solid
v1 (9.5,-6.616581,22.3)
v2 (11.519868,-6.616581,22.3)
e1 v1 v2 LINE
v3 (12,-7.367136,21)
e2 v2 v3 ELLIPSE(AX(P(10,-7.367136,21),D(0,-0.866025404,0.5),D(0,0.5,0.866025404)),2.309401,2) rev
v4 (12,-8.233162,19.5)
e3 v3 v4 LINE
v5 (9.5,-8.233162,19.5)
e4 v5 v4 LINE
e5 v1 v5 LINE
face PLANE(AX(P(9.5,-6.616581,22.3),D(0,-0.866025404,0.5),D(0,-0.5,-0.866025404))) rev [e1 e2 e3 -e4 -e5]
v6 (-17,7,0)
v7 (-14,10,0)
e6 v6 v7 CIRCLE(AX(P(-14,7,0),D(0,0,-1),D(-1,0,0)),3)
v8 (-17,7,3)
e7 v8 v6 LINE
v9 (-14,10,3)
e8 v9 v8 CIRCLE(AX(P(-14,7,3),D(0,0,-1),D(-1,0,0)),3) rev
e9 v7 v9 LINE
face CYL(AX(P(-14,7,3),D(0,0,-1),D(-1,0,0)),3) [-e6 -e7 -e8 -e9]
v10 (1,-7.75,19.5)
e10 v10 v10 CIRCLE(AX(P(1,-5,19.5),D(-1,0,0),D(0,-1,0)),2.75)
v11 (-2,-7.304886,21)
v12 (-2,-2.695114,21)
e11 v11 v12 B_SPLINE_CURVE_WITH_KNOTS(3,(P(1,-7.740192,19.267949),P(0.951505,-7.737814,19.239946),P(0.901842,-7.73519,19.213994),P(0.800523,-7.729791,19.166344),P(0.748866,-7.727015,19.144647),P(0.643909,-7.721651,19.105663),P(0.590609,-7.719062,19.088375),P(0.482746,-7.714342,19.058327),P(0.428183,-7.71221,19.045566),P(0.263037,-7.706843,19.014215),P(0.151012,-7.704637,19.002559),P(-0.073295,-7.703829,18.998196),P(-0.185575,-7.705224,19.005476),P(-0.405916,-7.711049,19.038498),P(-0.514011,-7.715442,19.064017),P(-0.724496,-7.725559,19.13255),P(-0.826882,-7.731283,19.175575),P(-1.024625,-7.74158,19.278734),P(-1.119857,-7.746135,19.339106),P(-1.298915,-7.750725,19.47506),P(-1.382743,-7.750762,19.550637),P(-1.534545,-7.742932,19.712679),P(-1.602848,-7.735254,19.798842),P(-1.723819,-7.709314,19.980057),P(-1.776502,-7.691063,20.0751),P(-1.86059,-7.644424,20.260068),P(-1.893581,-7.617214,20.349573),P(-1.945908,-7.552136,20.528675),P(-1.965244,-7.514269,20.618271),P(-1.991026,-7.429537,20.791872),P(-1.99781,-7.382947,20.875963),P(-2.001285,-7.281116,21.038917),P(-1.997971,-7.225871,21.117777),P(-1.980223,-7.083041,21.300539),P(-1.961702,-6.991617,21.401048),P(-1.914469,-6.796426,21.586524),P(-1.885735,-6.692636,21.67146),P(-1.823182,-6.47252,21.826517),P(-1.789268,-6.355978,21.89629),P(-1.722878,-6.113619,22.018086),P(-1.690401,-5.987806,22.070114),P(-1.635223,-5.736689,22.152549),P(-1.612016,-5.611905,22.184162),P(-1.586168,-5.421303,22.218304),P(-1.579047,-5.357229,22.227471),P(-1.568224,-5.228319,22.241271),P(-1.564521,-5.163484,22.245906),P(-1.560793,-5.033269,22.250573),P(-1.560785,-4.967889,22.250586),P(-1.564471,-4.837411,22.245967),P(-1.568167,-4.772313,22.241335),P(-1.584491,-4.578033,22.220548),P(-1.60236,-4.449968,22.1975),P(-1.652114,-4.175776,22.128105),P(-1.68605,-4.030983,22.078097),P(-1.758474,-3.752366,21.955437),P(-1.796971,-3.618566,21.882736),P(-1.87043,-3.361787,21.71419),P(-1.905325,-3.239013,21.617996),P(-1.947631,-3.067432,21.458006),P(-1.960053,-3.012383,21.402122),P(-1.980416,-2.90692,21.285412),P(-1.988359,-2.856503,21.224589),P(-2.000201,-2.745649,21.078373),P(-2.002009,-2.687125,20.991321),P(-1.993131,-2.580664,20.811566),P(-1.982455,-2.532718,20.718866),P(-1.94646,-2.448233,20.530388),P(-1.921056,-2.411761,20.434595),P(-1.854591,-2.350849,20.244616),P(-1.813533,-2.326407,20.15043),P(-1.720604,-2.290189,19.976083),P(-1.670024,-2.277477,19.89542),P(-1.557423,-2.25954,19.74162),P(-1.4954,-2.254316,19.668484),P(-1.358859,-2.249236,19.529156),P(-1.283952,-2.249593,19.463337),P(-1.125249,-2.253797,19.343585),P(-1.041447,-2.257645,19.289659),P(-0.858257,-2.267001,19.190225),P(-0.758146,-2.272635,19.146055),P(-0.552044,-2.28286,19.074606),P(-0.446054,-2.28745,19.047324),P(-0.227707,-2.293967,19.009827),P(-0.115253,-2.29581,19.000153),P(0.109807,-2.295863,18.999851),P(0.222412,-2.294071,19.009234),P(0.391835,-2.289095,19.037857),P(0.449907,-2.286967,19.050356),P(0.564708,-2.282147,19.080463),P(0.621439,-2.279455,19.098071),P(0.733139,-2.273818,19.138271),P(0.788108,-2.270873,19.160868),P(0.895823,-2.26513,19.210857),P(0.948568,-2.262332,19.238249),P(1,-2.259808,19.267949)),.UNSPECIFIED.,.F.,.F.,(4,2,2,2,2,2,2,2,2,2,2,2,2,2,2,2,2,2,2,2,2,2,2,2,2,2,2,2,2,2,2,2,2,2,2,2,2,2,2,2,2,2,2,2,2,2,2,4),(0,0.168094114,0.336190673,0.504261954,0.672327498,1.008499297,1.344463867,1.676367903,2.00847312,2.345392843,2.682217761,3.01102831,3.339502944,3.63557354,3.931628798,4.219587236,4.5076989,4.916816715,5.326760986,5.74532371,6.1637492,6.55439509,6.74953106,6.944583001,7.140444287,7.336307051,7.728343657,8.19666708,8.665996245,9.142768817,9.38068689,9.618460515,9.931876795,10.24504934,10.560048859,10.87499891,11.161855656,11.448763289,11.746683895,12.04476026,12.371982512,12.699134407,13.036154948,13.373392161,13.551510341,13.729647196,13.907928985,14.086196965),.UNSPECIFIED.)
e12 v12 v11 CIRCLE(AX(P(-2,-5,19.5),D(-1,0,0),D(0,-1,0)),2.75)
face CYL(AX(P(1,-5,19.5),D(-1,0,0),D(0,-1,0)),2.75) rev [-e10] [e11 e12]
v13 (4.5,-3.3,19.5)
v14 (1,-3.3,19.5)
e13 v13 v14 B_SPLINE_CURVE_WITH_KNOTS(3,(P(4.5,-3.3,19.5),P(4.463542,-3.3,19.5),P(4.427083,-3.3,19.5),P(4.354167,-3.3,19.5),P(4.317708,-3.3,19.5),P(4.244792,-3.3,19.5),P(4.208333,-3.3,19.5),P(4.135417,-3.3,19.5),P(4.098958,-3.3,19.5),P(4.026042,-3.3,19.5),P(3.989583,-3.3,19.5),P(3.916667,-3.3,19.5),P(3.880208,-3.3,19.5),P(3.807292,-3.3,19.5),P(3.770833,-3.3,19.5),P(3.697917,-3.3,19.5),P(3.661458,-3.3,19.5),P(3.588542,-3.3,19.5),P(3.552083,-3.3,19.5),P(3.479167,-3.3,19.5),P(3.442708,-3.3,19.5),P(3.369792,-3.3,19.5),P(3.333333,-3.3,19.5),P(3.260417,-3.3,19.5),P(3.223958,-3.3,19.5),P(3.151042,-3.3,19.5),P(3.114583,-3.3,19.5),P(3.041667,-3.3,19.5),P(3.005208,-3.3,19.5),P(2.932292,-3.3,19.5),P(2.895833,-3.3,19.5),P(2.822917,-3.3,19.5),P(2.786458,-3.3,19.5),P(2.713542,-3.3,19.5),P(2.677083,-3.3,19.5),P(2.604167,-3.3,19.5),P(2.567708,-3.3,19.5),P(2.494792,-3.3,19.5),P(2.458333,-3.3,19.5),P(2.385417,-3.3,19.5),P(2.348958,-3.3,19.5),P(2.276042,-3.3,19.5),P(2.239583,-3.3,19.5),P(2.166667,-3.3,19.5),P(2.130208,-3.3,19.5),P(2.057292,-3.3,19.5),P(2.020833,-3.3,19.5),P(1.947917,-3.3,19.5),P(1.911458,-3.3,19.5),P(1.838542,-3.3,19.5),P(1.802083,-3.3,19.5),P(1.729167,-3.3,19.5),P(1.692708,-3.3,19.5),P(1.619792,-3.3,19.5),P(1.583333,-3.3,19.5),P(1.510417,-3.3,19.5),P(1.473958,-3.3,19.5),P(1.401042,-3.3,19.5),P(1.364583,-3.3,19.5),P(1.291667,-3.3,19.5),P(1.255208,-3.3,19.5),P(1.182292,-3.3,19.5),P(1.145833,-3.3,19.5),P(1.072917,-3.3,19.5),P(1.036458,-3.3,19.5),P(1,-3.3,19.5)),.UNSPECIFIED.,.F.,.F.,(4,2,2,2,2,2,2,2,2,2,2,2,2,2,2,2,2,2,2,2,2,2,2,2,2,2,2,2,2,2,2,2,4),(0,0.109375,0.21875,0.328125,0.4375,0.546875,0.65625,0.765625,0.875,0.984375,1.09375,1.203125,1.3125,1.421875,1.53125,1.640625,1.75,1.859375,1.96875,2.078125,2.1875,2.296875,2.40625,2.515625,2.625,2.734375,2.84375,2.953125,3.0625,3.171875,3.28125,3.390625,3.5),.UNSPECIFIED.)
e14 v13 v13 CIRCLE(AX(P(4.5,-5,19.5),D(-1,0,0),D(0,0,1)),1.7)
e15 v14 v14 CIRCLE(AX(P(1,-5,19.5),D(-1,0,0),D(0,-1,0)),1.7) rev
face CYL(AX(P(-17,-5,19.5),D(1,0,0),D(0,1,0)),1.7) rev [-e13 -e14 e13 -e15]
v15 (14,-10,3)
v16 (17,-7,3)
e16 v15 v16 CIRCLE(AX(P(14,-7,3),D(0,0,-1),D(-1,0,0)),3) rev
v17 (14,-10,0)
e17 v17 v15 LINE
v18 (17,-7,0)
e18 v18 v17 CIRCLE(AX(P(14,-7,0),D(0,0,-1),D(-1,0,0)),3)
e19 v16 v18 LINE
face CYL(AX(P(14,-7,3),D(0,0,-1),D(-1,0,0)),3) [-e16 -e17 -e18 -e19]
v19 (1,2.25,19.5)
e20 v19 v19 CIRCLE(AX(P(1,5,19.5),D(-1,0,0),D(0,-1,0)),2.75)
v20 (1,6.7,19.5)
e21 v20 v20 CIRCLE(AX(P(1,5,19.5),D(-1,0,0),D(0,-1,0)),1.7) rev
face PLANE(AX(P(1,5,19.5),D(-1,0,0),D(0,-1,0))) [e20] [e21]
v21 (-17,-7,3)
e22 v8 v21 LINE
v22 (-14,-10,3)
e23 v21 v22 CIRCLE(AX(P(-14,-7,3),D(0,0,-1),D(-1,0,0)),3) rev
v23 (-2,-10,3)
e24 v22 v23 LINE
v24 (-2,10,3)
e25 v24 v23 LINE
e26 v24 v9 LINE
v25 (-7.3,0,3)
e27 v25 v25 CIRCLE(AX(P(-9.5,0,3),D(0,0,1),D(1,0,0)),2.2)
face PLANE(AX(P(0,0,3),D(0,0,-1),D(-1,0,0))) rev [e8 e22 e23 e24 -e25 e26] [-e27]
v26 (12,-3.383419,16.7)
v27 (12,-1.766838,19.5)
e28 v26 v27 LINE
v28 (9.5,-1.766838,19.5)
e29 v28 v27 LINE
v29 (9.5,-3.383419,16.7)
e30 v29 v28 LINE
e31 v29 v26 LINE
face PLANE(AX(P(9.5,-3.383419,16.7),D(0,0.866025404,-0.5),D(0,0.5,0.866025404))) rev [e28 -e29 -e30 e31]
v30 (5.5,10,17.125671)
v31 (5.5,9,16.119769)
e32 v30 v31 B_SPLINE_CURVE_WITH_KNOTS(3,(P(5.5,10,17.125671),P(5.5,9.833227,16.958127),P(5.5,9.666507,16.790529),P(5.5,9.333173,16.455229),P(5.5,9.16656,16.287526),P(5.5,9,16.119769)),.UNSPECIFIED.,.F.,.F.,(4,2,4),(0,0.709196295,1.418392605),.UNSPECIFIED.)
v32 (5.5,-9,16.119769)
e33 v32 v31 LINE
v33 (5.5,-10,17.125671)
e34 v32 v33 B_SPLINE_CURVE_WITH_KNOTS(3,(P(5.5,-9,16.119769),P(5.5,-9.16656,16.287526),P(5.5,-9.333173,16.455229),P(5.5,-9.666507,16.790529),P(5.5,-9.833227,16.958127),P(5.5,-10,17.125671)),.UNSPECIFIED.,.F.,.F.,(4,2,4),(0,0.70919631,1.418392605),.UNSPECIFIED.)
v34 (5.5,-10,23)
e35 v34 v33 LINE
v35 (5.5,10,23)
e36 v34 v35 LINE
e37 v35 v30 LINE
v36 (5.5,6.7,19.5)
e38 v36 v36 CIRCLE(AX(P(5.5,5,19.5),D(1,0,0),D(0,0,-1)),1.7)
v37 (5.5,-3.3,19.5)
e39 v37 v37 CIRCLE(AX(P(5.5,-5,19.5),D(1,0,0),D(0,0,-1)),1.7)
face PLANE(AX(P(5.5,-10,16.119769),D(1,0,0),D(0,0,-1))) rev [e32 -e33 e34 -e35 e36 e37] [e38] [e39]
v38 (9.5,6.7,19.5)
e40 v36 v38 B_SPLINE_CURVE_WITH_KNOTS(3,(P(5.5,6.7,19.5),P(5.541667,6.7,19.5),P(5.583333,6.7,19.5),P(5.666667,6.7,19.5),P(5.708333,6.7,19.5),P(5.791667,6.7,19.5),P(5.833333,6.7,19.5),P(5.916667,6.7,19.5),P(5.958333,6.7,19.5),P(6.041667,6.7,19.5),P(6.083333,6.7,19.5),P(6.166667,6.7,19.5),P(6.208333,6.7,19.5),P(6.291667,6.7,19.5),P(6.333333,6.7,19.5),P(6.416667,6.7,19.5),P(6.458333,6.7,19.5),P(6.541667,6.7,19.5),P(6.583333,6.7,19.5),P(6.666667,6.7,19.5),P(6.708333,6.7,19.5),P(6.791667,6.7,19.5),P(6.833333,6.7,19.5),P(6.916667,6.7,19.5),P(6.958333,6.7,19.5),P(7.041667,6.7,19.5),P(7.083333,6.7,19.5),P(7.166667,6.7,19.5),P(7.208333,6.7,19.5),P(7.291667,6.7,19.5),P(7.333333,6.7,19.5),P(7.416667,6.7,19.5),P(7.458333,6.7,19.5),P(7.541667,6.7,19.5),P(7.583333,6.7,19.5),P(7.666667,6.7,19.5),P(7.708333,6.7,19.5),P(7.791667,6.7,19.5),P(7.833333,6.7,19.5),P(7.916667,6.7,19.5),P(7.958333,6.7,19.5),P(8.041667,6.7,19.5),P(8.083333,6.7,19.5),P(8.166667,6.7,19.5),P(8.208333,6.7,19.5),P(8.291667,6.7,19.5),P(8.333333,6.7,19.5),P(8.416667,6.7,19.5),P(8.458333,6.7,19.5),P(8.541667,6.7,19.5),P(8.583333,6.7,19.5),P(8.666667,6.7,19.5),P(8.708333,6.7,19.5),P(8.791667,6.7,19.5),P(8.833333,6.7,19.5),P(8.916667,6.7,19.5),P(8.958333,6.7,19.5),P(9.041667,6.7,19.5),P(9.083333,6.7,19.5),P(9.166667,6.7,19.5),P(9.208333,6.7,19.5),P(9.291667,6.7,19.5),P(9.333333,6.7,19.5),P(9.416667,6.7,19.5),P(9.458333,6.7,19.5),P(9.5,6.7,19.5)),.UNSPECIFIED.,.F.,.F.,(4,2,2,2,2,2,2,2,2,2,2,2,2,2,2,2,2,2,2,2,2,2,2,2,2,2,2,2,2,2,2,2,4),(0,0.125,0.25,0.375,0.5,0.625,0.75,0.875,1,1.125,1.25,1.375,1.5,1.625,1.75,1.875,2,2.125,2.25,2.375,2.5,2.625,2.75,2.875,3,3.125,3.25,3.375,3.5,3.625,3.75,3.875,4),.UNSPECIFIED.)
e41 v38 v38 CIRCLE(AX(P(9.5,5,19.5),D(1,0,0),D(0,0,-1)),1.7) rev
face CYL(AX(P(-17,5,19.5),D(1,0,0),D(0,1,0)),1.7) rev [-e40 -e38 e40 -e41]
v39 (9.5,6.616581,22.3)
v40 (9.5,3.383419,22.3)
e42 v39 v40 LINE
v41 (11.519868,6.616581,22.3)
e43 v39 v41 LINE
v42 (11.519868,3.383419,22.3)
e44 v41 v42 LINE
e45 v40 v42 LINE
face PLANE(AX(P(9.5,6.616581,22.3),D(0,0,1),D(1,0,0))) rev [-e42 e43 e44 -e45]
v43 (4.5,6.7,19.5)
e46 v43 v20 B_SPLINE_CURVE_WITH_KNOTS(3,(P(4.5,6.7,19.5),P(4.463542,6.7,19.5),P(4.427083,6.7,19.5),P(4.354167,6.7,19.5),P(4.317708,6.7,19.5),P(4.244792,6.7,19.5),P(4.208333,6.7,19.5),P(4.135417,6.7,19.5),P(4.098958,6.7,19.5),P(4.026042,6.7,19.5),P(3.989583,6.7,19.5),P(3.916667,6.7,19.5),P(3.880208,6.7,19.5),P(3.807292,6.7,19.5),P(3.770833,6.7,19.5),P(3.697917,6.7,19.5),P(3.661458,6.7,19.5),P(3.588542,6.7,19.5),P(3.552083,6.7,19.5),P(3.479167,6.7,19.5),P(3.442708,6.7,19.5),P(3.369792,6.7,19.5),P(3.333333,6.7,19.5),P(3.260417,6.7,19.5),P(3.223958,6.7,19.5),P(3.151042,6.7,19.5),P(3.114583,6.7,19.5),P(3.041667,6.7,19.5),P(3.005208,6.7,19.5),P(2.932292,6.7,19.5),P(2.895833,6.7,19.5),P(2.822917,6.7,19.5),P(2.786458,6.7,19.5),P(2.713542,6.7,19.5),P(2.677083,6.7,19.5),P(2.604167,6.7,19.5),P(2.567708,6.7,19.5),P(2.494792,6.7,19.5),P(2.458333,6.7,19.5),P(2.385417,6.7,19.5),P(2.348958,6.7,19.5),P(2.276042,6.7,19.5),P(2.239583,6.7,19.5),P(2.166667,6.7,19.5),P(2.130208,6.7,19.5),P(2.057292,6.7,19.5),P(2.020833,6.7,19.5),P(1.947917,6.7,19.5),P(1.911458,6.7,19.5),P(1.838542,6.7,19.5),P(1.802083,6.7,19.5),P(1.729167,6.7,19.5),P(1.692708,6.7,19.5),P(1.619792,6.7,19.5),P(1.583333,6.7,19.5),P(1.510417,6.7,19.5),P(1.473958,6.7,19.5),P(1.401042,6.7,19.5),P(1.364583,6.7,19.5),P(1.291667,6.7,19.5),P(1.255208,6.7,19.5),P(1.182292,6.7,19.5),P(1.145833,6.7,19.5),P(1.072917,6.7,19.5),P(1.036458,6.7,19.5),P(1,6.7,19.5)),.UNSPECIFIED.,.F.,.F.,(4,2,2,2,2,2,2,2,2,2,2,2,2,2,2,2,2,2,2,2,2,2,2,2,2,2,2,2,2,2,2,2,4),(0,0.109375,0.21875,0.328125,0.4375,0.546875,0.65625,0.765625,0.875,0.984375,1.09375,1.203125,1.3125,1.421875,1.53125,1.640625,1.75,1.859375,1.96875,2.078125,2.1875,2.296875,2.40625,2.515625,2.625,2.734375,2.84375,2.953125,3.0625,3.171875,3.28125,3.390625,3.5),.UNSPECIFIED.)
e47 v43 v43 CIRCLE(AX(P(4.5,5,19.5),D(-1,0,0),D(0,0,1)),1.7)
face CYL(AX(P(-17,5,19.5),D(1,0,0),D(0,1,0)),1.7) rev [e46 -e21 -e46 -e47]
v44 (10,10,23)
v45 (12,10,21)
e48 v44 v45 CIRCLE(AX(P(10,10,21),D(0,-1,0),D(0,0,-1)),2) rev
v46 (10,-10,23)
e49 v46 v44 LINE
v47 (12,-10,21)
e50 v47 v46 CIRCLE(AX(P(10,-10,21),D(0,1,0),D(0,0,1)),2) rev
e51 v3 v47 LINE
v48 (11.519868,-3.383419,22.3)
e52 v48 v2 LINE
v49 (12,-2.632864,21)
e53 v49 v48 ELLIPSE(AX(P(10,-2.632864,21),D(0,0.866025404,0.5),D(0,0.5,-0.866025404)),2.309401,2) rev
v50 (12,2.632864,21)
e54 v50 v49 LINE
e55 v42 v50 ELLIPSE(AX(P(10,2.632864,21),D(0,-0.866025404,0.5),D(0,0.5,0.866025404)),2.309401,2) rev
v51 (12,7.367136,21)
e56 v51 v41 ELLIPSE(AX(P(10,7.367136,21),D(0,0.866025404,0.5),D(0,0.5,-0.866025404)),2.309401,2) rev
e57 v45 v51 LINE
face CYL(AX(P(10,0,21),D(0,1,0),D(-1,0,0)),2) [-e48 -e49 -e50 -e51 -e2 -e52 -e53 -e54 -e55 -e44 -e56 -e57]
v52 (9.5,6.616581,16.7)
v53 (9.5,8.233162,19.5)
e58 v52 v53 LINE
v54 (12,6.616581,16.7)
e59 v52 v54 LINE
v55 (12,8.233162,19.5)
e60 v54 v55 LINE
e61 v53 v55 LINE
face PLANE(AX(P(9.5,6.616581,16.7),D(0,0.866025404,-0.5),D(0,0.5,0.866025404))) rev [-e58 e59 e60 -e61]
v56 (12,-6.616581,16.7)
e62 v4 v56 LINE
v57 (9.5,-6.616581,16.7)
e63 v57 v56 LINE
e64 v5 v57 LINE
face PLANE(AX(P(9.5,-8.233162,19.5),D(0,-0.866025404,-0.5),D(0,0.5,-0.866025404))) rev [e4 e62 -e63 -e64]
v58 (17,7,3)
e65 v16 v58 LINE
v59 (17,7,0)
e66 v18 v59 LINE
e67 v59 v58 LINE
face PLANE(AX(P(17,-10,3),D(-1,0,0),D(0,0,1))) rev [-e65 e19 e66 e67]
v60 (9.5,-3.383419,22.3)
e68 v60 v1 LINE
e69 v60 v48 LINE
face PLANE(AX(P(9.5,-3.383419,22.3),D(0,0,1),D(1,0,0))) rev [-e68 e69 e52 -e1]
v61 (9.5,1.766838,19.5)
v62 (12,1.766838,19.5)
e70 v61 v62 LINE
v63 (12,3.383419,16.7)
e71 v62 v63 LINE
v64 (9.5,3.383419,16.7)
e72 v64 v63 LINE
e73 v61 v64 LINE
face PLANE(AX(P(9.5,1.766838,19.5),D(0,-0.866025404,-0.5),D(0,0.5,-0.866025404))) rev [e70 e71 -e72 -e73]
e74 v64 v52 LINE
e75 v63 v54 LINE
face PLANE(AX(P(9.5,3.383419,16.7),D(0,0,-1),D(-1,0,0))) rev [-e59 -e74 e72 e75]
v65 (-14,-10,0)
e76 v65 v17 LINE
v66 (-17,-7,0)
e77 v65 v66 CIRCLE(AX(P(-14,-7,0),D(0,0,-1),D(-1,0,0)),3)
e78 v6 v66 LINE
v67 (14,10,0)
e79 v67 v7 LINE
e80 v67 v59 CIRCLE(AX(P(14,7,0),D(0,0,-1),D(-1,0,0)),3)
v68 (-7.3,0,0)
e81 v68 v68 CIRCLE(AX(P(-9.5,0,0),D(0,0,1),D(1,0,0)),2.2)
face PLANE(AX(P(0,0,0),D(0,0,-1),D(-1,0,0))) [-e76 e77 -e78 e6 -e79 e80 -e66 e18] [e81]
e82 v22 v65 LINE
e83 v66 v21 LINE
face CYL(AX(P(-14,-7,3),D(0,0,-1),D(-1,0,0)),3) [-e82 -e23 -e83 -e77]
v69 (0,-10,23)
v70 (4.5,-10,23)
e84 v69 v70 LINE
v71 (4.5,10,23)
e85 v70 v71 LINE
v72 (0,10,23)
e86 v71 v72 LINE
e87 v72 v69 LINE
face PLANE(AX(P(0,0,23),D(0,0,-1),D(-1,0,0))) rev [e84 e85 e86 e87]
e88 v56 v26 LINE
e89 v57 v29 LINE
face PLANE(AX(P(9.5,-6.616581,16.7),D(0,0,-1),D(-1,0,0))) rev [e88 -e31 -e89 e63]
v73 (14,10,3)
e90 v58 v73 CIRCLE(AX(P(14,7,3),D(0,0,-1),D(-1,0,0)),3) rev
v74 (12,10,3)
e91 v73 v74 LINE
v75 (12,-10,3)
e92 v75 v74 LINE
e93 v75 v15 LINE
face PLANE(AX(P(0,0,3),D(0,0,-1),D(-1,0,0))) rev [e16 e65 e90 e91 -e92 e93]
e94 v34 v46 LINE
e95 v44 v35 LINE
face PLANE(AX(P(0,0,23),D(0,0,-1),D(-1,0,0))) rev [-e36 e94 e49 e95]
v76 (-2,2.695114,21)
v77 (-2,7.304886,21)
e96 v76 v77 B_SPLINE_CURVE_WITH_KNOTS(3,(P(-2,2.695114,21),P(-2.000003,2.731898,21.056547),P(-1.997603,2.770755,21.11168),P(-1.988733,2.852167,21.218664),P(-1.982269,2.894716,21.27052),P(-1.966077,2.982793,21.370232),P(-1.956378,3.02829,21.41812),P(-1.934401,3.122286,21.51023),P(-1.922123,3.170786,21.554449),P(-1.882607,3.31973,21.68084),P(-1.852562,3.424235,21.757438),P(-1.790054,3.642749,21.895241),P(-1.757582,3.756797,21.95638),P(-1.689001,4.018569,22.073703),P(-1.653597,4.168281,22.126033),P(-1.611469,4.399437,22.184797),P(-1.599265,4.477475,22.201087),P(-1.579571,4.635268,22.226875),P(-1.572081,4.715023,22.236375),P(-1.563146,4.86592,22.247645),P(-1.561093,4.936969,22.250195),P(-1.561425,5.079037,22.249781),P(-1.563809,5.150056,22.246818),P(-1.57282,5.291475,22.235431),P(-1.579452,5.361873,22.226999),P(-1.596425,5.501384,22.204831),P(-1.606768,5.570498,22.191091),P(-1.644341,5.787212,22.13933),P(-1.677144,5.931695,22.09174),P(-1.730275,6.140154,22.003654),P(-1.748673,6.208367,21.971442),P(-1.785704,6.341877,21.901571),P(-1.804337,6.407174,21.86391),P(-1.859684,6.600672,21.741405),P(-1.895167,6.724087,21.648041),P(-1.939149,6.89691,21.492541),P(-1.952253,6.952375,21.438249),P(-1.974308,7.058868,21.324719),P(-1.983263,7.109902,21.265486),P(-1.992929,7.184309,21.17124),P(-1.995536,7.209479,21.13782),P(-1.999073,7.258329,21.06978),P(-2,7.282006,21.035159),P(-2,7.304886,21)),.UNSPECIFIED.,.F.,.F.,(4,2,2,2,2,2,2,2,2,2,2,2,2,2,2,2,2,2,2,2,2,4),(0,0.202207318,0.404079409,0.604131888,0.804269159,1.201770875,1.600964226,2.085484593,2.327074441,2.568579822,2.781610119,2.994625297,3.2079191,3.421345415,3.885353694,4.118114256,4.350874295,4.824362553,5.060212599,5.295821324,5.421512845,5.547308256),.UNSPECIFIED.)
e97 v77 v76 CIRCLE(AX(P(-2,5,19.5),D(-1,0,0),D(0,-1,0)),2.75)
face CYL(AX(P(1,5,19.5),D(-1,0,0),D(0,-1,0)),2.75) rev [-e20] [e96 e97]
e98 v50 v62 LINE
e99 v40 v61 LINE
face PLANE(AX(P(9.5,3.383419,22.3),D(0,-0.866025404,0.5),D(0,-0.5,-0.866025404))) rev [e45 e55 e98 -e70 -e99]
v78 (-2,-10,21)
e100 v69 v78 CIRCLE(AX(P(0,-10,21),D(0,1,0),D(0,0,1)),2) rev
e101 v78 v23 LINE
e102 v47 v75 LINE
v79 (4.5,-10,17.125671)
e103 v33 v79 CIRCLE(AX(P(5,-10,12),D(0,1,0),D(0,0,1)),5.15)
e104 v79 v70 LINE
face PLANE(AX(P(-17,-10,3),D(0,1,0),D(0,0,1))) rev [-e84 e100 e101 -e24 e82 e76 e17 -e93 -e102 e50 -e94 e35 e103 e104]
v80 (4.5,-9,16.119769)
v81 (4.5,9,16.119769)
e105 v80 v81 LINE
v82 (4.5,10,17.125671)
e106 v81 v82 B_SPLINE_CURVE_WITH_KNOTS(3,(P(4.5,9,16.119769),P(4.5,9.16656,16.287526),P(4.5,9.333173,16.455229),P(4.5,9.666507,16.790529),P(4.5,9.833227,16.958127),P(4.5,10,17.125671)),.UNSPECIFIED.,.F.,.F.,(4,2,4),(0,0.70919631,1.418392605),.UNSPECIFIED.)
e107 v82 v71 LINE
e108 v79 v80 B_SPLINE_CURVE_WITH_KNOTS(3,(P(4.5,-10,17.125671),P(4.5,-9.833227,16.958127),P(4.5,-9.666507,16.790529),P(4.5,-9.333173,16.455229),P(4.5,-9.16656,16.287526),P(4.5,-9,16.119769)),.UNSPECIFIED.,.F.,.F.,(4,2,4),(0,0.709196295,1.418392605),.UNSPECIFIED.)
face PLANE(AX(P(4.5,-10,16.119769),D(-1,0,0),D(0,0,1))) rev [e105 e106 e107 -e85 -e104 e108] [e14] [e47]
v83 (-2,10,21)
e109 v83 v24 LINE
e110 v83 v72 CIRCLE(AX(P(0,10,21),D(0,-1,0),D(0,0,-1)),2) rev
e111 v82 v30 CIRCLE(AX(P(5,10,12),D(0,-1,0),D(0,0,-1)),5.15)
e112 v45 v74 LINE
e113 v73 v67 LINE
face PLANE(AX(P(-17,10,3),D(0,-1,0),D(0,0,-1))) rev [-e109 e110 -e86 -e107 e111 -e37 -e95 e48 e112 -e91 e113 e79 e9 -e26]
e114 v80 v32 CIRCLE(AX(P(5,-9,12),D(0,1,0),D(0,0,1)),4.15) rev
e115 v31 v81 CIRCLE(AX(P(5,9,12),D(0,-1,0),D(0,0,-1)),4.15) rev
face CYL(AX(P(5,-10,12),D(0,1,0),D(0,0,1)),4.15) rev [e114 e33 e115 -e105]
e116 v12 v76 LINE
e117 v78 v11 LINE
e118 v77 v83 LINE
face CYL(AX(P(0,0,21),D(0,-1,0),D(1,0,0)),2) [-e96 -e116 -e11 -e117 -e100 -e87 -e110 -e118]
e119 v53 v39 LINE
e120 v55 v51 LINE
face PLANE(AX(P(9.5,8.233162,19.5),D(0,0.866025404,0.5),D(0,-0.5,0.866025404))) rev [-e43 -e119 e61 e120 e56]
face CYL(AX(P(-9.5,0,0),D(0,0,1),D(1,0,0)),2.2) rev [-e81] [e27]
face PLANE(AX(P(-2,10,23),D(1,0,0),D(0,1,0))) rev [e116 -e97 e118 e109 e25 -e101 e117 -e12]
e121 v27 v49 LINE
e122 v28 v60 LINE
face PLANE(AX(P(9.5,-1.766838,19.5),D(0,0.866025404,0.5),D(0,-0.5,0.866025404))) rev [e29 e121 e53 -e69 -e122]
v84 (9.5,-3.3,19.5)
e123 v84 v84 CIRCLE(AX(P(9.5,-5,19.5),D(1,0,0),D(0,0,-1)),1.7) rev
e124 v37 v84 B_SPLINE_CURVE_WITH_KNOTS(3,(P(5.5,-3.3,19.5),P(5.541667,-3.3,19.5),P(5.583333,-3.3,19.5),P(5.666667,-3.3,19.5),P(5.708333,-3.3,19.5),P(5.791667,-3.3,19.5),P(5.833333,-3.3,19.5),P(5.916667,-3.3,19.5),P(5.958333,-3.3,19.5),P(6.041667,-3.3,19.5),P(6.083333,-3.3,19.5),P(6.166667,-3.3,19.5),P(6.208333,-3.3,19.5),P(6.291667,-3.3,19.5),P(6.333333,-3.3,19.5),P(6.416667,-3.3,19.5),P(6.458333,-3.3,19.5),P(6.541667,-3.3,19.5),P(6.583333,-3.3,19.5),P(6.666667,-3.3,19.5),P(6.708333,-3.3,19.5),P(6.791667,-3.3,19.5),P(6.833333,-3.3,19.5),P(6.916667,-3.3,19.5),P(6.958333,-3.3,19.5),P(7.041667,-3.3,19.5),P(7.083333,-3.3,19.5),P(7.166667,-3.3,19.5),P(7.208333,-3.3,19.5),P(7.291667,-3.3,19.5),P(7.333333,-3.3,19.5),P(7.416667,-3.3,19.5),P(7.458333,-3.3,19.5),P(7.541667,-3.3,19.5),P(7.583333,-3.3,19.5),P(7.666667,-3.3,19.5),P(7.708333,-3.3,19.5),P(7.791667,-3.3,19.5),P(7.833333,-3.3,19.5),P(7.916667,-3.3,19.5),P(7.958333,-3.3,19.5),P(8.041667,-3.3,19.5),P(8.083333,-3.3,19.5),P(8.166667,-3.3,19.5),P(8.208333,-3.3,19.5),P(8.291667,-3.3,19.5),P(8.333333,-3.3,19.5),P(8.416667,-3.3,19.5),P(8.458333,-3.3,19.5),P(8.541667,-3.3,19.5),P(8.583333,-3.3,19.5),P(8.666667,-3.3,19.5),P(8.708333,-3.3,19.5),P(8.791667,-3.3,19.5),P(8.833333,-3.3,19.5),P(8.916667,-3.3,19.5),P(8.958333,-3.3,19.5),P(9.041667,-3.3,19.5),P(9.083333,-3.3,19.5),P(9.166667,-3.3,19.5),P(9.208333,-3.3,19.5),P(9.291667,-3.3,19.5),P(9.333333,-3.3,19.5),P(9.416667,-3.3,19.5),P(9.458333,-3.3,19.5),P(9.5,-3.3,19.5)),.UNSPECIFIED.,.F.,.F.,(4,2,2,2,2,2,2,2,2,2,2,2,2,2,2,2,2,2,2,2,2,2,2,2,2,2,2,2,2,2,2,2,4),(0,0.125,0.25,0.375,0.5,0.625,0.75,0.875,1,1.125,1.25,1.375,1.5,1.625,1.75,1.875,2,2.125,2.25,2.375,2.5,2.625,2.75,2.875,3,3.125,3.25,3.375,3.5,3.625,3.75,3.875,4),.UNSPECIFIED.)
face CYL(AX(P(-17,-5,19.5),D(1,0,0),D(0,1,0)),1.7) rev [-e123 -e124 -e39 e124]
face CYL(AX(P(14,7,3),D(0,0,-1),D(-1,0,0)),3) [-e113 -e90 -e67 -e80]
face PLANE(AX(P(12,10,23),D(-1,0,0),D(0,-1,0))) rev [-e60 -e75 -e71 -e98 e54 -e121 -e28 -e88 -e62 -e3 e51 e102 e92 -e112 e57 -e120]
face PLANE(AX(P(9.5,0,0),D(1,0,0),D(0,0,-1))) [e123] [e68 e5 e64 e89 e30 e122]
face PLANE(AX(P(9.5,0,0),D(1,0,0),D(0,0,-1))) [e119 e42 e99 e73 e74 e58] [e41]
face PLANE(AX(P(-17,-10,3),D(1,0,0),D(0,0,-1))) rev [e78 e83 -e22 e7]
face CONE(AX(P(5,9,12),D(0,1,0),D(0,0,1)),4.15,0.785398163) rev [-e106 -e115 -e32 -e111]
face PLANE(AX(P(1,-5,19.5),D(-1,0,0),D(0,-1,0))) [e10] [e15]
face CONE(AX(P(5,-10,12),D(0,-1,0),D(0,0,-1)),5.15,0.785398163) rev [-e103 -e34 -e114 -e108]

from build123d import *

# Parameters (mm, degrees)
SKETCH1_W           = 34
SKETCH1_H           = 20
BOSS_EXTRUDE1_DEPTH = 3
FILLET1_R           = 3
SKETCH2_W           = 14
SKETCH2_H           = 20
BOSS_EXTRUDE2_DEPTH = 20
CUT_EXTRUDE1_DEPTH  = 35.899856733
CHAMFER1_SIZE       = 1
SKETCH4_R           = 2.2
CUT_EXTRUDE2_DEPTH  = 29.08914381
SKETCH5_R           = 1.7
CUT_EXTRUDE3_DEPTH  = 39.340579025
FILLET2_R           = 2
CUT_EXTRUDE4_DEPTH  = 2.5
SKETCH7_R           = 2.75
CUT_EXTRUDE5_DEPTH  = 3


with BuildPart() as part:
    # Sketch1 → Boss-Extrude1 (new body)
    with BuildSketch(Plane.XY):
        Rectangle(SKETCH1_W, SKETCH1_H)
    extrude(amount=BOSS_EXTRUDE1_DEPTH)

    # Fillet1
    fillet1_edges = [part.edges().sort_by_distance(p)[0] for p in [
        (17, -10, 1.5),
        (-17, -10, 1.5),
        (-17, 10, 1.5),
        (17, 10, 1.5),
    ]]
    fillet(fillet1_edges, radius=FILLET1_R)

    # Sketch2 → Boss-Extrude2 (add)
    with BuildSketch(Plane.XY.offset(3)):
        with Locations((5, 0)):
            Rectangle(SKETCH2_W, SKETCH2_H)
    extrude(amount=BOSS_EXTRUDE2_DEPTH)

    # Sketch3 → Cut-Extrude1 (cut, through all)
    with BuildSketch(Plane(origin=(0, 10, 0), x_dir=(1, 0, 0), z_dir=(0, 1, 0))):
        with BuildLine():
            Line((4.5, -16.119769411), (4.5, -23))
            Line((4.5, -23), (5.5, -23))
            Line((5.5, -23), (5.5, -16.119769411))
            ThreePointArc((5.5, -16.119769411), (5, -7.85), (4.5, -16.119769411))
        make_face()
    extrude(amount=-CUT_EXTRUDE1_DEPTH, mode=Mode.SUBTRACT)

    # Chamfer1
    chamfer1_edges = [part.edges().sort_by_distance(p)[0] for p in [
        (5, -10, 7.85),
        (5, 10, 7.85),
    ]]
    chamfer(chamfer1_edges, length=CHAMFER1_SIZE)

    # Sketch4 → Cut-Extrude2 (cut, through all)
    with BuildSketch(Plane.XY.offset(3)):
        with Locations((-9.5, 0)):
            Circle(SKETCH4_R)
    extrude(amount=-CUT_EXTRUDE2_DEPTH, mode=Mode.SUBTRACT)

    # Sketch5 → Cut-Extrude3 (cut, through all)
    with BuildSketch(Plane(origin=(12, 0, 0), x_dir=(0, 0, -1), z_dir=(1, 0, 0))):
        with Locations(Location((-19.5, 5, 0), (0, 0, 90))):
            Circle(SKETCH5_R)
        with Locations(Location((-19.5, -5, 0), (0, 0, 90))):
            Circle(SKETCH5_R)
    extrude(amount=-CUT_EXTRUDE3_DEPTH, mode=Mode.SUBTRACT)

    # Fillet2
    # the kernel refuses this fillet: 2 mm, written as the material it takes off along each edge
    with BuildSketch(Plane(origin=(12, -15, 23), x_dir=(-1, 0, 0), z_dir=(0, 1, 0)), Plane(origin=(-2, 15, 23), x_dir=(1, 0, 0), z_dir=(0, -1, 0))) as fillet2_piece_1:
        with BuildLine():
            CenterArc((FILLET2_R, -FILLET2_R), FILLET2_R, 90, 90)
            Line((0, -FILLET2_R), (0, 0))
            Line((0, 0), (FILLET2_R, 0))
        make_face()
    extrude(amount=30, mode=Mode.SUBTRACT)

    # Sketch6 → Cut-Extrude4 (cut)
    with BuildSketch(Plane(origin=(12, 0, 0), x_dir=(0, 0, -1), z_dir=(1, 0, 0))):
        Polygon((-16.7, 3.383419246), (-16.7, 6.616580754), (-19.5, 8.233161507), (-22.3, 6.616580754), (-22.3, 3.383419246), (-19.5, 1.766838493), align=None)
        Polygon((-16.7, -3.383419246), (-19.5, -1.766838493), (-22.3, -3.383419246), (-22.3, -6.616580754), (-19.5, -8.233161507), (-16.7, -6.616580754), align=None)
    extrude(amount=-CUT_EXTRUDE4_DEPTH, mode=Mode.SUBTRACT)

    # Sketch7 → Cut-Extrude5 (cut)
    with BuildSketch(Plane.ZY.offset(2)):
        with Locations(Location((19.5, 5, 0), (0, 0, 270))):
            Circle(SKETCH7_R)
        with Locations(Location((19.5, -5, 0), (0, 0, 270))):
            Circle(SKETCH7_R)
    extrude(amount=-CUT_EXTRUDE5_DEPTH, mode=Mode.SUBTRACT)


solid = part.part
